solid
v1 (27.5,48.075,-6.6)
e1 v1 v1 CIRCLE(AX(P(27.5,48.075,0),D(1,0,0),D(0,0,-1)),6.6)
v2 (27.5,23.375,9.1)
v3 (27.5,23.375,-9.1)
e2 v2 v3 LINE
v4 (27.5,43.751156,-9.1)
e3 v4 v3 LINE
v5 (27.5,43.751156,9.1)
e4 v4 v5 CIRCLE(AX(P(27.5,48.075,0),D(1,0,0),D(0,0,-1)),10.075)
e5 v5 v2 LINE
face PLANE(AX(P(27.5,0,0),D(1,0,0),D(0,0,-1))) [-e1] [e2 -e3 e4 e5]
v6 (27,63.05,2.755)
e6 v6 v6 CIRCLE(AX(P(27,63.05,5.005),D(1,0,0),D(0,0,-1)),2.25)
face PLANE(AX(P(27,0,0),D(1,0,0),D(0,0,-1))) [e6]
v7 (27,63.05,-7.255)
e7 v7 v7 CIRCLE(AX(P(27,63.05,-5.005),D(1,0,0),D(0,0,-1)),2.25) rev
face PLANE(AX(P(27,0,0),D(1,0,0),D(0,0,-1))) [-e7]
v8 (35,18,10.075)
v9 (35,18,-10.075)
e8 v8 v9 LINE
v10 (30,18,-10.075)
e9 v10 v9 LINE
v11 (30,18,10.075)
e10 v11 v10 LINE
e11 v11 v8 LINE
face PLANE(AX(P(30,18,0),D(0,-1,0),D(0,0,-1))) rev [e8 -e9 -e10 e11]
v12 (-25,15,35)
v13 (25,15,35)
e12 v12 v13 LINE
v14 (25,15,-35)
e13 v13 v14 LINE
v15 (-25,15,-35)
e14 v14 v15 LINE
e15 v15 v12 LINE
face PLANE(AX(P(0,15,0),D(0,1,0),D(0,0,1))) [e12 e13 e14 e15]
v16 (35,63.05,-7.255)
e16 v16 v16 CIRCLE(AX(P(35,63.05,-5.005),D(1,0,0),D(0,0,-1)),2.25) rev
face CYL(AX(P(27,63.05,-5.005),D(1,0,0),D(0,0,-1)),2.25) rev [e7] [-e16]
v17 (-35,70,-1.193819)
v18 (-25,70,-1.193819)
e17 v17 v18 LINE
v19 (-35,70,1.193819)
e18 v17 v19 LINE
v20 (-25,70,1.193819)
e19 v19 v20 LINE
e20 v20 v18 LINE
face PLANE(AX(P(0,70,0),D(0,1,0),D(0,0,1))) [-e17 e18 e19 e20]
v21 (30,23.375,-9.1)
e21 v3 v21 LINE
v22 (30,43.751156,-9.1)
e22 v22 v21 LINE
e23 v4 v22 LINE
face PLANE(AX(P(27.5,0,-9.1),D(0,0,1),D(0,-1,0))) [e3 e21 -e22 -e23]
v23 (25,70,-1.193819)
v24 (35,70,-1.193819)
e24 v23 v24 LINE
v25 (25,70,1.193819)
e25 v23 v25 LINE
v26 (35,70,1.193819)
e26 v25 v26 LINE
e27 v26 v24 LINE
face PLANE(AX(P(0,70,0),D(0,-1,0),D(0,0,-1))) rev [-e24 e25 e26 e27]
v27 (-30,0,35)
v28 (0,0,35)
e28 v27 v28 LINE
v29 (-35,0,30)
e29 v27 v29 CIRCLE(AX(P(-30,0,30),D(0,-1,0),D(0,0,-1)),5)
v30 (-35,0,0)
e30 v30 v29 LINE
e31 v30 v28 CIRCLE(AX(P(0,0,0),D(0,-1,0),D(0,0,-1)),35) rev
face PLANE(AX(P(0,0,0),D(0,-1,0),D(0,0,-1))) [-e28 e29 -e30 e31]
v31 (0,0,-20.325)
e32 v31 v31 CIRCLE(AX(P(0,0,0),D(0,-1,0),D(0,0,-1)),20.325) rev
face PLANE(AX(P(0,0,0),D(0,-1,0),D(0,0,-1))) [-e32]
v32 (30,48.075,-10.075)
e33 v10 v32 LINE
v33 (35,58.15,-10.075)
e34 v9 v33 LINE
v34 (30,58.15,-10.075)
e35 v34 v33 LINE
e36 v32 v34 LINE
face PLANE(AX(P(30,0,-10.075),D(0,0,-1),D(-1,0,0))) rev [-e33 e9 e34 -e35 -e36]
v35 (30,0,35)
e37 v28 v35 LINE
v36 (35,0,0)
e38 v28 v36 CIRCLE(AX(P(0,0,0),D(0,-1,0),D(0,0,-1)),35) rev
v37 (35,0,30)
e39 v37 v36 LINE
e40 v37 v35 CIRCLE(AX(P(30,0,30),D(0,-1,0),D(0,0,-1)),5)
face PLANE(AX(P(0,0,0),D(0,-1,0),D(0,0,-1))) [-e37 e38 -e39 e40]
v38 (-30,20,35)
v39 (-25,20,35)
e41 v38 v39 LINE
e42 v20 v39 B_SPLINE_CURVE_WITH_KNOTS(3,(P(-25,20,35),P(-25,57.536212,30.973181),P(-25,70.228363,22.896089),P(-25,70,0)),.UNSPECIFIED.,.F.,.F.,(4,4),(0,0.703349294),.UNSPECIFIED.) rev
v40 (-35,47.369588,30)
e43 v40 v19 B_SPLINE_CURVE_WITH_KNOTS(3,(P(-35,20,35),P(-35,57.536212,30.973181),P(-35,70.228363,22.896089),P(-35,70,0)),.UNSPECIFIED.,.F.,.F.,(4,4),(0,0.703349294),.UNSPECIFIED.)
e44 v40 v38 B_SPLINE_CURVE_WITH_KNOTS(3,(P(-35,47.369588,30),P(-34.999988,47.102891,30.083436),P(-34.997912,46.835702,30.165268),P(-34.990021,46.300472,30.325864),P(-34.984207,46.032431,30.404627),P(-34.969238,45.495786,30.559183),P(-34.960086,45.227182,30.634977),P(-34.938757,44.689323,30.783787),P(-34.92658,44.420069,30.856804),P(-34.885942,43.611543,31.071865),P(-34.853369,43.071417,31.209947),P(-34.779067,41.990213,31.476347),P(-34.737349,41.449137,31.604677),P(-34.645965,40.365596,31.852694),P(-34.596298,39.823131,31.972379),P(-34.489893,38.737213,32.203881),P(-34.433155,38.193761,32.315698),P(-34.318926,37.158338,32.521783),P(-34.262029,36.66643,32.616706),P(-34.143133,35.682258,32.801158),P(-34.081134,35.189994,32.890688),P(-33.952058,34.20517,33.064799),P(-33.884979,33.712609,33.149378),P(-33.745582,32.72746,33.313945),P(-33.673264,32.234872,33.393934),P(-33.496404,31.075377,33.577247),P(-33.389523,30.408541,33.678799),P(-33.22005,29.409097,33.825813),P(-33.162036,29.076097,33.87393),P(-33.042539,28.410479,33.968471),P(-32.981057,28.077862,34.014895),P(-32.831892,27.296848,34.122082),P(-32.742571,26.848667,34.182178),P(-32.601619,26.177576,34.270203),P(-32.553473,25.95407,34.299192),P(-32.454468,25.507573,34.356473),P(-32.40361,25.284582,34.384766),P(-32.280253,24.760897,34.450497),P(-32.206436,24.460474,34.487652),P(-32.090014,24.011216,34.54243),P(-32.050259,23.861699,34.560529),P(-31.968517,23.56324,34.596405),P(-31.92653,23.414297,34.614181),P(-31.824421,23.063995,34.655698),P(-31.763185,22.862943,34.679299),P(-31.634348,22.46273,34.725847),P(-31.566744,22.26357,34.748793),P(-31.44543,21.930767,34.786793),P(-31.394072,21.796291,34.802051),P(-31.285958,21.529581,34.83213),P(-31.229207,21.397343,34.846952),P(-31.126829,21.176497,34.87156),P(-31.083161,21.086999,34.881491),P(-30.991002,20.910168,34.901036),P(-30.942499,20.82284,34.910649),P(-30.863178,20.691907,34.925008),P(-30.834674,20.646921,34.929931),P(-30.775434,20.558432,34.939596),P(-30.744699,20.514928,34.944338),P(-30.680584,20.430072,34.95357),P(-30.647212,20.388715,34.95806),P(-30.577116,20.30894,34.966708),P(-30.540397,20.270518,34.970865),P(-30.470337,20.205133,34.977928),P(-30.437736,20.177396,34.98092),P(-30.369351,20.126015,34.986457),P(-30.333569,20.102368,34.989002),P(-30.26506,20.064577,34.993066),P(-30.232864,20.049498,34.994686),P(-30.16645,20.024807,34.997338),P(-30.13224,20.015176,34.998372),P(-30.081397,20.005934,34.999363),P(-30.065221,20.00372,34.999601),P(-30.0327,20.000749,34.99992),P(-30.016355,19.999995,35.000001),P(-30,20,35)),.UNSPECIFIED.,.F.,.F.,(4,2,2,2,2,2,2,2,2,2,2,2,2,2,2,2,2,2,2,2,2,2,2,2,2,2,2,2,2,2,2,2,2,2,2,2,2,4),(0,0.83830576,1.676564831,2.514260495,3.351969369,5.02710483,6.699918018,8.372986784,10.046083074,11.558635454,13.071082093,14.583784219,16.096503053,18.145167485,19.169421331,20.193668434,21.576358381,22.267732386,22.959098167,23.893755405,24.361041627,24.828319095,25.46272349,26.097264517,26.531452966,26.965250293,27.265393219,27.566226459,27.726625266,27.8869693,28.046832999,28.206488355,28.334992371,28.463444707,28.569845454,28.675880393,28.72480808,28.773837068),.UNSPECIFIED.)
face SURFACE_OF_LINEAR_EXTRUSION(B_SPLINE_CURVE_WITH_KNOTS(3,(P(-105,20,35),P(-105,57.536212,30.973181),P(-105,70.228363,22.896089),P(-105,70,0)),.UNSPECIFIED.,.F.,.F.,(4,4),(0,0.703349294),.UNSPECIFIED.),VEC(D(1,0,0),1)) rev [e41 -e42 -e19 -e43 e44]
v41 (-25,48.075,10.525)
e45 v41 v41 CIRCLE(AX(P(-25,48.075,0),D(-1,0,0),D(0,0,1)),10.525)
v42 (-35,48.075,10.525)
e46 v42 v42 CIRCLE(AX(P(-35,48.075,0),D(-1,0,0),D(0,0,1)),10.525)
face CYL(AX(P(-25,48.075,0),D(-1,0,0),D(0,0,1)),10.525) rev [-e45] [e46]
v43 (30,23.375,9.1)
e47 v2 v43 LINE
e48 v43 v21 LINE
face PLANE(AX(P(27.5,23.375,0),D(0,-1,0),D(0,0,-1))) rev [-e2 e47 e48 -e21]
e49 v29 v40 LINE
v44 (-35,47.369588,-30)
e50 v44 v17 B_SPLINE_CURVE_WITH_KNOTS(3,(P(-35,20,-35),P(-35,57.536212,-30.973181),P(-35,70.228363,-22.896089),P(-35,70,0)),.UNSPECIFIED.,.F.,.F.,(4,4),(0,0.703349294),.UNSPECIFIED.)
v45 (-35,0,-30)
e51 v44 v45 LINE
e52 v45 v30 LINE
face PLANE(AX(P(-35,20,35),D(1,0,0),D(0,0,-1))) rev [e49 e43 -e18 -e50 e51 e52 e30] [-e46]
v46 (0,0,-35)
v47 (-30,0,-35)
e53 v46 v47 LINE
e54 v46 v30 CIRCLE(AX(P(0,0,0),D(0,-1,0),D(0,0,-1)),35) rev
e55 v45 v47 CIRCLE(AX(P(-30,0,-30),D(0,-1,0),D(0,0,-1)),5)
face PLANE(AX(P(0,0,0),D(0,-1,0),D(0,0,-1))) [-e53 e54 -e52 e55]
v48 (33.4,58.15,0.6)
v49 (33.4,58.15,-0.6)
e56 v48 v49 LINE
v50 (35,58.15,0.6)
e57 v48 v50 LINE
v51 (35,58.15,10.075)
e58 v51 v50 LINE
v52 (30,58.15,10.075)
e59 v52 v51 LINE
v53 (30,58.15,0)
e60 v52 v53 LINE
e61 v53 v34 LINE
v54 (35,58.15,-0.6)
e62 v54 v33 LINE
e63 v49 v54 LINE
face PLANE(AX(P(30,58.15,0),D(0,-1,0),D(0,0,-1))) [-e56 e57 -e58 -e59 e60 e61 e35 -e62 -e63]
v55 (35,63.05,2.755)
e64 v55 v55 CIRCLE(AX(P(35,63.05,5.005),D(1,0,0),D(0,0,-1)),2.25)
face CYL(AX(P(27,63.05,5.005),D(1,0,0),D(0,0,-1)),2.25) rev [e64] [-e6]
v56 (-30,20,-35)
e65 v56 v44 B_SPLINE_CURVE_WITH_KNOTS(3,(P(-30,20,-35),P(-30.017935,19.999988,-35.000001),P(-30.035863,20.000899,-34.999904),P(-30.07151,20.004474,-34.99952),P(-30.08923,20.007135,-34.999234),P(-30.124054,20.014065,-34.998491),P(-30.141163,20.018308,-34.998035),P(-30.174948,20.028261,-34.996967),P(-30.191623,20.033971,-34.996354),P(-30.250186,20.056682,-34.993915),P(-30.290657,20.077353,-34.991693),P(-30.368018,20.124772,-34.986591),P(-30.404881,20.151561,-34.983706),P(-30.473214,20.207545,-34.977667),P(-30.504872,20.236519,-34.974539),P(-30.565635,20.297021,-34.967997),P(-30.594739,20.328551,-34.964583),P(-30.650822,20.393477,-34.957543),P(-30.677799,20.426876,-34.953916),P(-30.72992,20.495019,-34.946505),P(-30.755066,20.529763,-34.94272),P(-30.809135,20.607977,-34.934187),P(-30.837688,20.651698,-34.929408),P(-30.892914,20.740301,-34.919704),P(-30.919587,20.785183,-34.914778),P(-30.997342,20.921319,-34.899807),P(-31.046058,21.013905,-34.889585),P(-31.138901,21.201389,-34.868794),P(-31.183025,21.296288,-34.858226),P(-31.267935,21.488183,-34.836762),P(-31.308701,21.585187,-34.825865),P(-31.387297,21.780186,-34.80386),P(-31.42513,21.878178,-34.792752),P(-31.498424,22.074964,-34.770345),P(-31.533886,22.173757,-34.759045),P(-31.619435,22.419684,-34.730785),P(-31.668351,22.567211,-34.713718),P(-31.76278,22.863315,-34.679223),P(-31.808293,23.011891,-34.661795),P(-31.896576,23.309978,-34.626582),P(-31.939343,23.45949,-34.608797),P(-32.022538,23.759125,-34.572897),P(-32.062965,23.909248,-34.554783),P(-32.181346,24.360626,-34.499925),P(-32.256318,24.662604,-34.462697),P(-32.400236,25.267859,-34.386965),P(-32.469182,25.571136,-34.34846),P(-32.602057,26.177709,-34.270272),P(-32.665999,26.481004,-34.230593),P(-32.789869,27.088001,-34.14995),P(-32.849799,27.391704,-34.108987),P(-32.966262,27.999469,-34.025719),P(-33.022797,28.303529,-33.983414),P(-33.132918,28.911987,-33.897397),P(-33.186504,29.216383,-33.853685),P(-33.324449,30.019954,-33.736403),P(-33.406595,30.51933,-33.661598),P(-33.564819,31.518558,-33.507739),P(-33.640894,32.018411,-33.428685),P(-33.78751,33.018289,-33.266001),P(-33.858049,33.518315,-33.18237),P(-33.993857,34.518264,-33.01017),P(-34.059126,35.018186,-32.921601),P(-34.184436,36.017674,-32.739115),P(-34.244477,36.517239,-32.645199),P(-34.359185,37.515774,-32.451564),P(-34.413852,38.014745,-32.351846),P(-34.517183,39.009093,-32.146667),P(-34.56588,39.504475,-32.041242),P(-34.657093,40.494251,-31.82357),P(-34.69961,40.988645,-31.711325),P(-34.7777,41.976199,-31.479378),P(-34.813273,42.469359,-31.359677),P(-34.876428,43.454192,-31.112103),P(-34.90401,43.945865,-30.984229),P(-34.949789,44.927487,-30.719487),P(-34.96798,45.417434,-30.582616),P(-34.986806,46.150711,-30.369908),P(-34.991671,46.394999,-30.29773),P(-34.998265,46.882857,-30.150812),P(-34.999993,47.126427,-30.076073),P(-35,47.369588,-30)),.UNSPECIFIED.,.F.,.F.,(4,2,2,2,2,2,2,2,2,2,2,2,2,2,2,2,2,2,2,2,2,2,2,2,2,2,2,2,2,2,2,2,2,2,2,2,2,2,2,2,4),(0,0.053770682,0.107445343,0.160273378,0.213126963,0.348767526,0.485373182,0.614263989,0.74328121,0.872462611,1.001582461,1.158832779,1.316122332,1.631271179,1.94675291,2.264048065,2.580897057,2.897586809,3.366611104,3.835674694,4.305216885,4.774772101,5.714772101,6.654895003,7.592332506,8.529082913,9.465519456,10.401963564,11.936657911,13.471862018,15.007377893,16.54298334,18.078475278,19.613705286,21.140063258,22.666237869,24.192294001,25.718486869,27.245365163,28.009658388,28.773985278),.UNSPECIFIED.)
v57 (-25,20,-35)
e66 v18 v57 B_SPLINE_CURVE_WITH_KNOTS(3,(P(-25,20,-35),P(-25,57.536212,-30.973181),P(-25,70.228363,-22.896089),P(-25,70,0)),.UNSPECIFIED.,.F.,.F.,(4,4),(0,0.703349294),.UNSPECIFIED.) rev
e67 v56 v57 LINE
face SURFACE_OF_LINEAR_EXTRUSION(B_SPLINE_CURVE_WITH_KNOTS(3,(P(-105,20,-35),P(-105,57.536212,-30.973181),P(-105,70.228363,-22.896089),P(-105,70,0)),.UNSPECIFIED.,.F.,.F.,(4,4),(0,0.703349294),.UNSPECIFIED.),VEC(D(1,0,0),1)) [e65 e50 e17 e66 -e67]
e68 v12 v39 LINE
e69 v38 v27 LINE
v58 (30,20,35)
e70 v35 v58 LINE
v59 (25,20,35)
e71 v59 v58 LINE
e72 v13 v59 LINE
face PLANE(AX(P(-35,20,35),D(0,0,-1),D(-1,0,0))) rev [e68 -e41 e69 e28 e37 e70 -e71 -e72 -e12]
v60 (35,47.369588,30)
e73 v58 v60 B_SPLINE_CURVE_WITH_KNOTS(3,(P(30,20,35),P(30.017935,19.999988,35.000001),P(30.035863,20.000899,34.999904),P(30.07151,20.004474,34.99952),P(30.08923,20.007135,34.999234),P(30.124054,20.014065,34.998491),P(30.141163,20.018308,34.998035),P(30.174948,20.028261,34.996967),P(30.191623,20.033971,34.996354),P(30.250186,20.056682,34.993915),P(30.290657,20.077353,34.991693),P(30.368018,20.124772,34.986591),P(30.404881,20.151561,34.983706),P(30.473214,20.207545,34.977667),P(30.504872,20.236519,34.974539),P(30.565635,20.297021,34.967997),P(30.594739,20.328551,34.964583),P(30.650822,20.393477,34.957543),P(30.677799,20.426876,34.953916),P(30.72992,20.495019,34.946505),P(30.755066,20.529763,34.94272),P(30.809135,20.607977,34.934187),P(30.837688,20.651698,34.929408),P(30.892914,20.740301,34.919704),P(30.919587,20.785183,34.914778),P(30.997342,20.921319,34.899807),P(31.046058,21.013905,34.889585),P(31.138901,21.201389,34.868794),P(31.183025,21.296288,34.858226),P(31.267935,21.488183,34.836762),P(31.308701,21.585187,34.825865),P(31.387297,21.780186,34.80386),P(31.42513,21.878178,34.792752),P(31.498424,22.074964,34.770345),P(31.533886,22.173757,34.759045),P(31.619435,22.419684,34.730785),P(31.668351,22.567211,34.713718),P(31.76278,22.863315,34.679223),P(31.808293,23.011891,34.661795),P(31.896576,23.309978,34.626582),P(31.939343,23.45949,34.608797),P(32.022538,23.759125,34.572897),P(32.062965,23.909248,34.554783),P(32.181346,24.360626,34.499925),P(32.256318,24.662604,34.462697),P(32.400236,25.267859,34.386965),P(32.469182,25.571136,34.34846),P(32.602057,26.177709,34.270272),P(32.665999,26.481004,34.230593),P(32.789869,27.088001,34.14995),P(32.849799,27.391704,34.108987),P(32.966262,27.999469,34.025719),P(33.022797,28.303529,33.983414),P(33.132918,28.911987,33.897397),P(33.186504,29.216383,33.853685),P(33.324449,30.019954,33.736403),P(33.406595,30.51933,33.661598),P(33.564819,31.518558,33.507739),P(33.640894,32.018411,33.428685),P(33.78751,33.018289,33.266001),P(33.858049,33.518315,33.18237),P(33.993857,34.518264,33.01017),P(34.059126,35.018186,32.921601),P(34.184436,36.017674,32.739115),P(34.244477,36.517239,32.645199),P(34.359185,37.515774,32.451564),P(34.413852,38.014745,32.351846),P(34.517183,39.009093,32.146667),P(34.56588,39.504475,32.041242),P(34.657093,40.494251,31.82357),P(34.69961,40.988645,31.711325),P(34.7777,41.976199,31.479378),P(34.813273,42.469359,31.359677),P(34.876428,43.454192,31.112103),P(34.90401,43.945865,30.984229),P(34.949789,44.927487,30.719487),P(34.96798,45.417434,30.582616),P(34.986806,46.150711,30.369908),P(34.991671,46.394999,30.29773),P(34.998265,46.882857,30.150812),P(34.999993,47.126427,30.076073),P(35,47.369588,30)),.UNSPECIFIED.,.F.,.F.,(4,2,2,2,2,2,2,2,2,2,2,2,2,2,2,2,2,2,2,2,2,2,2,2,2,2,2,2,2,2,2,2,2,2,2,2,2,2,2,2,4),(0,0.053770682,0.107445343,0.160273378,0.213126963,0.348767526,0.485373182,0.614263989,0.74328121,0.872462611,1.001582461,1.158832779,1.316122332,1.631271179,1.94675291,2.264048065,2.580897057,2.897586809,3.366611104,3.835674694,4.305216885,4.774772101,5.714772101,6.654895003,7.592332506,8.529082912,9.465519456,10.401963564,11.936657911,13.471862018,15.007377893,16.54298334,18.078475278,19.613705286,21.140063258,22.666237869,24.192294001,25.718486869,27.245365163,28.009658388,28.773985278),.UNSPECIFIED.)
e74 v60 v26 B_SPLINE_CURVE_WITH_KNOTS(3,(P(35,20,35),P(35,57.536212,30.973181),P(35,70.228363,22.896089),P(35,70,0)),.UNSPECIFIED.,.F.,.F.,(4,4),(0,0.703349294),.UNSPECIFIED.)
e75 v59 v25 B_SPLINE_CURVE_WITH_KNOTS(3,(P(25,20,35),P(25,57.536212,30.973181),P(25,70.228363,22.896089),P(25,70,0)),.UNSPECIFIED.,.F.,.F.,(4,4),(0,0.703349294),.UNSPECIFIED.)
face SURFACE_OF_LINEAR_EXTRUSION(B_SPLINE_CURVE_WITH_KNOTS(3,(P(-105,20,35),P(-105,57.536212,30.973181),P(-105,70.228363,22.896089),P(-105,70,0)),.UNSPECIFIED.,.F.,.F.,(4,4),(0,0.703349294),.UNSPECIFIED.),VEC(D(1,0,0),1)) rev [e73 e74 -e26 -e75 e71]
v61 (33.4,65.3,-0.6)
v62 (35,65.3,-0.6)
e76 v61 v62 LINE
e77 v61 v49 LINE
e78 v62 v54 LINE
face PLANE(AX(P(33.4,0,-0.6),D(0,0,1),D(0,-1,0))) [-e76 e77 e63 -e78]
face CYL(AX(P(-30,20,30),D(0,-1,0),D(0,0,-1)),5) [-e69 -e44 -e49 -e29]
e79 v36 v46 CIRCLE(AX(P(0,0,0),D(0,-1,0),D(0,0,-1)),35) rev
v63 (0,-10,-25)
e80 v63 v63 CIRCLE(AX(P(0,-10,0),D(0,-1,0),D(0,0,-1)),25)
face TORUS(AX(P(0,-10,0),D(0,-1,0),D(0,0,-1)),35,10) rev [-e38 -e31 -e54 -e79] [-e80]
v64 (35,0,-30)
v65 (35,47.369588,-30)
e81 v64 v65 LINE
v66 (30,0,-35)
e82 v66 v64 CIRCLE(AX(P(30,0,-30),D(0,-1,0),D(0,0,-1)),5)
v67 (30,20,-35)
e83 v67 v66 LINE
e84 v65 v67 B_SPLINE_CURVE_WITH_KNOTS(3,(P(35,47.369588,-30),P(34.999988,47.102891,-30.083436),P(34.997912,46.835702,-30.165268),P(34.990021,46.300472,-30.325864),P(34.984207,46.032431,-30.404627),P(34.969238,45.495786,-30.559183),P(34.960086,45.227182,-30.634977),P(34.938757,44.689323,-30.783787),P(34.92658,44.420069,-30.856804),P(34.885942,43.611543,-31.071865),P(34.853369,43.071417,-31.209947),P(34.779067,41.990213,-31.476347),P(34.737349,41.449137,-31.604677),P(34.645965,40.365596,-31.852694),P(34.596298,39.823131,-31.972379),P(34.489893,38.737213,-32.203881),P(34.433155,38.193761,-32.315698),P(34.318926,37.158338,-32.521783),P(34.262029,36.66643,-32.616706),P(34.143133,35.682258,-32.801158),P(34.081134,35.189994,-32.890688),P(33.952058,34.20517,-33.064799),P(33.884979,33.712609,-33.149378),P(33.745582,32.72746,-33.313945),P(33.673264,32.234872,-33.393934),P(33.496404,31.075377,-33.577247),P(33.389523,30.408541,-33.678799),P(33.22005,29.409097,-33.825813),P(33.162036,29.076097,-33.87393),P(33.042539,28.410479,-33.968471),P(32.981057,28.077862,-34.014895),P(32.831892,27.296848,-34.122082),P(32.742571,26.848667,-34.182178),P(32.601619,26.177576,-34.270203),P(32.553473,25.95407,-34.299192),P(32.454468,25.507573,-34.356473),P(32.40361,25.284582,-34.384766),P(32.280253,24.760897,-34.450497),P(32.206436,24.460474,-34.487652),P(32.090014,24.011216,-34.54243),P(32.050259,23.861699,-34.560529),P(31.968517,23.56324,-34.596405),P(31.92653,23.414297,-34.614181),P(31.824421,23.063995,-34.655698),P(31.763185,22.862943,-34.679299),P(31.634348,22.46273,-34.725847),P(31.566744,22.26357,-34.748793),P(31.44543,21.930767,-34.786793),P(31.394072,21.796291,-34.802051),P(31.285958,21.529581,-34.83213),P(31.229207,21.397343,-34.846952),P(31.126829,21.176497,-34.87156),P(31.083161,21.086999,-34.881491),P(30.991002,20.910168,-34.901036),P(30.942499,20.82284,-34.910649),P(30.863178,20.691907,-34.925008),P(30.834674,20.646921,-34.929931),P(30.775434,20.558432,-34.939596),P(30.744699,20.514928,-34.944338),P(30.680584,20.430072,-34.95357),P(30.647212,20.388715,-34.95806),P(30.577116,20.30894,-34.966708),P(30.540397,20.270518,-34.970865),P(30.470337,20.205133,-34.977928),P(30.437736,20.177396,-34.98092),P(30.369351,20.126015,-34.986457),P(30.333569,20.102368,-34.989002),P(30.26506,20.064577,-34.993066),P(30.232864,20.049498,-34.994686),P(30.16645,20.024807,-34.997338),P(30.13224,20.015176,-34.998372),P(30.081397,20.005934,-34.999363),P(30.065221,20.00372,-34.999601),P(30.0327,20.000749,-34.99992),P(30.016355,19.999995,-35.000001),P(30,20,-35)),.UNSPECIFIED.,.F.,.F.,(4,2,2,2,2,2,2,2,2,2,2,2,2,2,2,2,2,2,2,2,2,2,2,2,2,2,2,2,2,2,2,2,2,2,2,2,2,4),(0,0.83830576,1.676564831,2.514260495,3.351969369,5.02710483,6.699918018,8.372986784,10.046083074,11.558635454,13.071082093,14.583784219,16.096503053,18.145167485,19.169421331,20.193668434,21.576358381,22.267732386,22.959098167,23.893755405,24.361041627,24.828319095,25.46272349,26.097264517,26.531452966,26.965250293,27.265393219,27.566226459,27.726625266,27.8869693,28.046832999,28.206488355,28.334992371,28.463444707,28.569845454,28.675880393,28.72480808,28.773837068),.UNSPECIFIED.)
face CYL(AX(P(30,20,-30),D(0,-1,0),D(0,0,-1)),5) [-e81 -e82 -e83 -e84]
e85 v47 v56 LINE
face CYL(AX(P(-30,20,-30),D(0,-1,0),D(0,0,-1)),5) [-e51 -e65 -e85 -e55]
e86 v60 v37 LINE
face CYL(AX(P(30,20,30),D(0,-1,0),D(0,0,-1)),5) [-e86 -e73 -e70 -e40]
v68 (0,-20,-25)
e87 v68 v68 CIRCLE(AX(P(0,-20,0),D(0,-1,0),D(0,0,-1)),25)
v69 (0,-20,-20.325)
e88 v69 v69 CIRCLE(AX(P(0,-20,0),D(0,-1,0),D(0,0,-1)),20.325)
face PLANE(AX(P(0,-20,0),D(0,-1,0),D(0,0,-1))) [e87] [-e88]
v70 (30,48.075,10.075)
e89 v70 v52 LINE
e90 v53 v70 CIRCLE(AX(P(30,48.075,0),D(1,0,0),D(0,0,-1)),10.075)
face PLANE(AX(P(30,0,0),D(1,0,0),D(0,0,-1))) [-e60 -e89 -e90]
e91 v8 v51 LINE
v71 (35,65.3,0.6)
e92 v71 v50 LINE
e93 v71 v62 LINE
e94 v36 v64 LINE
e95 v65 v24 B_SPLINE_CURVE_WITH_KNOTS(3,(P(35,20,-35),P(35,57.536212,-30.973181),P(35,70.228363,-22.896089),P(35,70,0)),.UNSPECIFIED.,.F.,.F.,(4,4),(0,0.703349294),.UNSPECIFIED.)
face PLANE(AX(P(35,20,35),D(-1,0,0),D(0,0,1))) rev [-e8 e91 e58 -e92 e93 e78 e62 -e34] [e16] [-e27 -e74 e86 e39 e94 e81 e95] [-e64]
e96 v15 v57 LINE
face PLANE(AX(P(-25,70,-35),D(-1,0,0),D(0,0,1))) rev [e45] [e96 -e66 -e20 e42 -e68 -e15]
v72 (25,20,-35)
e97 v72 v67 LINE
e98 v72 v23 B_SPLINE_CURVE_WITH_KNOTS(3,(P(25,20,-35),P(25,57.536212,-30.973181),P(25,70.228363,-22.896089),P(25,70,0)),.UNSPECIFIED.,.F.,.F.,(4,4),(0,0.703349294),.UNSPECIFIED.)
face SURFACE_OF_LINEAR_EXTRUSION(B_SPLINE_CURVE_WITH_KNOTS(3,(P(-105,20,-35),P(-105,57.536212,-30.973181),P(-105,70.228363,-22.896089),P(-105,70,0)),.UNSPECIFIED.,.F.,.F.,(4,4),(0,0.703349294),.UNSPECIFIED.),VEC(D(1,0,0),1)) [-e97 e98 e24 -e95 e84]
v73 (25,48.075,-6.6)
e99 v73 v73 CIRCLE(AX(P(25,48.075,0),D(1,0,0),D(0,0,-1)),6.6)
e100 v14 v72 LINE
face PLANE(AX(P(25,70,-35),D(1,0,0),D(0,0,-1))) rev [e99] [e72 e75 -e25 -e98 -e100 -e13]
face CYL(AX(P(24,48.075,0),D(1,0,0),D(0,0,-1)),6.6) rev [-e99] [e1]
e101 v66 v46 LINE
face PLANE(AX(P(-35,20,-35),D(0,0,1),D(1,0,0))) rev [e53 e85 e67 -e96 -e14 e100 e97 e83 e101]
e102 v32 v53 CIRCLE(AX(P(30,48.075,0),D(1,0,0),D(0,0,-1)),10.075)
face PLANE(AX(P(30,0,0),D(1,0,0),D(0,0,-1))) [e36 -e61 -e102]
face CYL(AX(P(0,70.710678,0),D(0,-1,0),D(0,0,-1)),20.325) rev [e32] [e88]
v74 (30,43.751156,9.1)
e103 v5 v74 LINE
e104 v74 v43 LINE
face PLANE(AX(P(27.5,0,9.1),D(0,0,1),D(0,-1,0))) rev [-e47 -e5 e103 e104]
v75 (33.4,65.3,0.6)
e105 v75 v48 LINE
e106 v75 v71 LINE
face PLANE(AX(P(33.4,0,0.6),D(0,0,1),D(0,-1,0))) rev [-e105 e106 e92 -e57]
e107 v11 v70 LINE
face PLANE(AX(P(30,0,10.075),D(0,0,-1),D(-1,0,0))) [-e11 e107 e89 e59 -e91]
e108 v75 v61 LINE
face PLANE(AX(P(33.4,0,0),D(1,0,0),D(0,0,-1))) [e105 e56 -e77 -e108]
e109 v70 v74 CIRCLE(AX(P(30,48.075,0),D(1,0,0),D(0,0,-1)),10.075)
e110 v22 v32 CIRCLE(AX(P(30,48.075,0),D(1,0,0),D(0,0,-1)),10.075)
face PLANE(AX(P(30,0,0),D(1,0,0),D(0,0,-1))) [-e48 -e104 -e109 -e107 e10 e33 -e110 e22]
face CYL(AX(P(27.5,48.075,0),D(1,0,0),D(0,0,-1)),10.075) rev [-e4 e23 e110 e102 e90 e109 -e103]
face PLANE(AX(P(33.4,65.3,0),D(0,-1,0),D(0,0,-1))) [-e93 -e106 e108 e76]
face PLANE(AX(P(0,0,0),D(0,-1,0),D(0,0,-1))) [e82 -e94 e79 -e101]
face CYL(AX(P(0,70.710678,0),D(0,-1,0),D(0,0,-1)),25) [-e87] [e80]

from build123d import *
from build123d.topology import SkipClean

# Parameters (mm, degrees)
SKETCH1_W           = 70
SKETCH1_H           = 70
BOSS_EXTRUDE1_DEPTH = 20
SKETCH3_W           = 10
SKETCH3_H           = 70
BOSS_EXTRUDE2_DEPTH = 50
SKETCH4_R           = 25
SKETCH4_R_2         = 20.325
BOSS_EXTRUDE3_DEPTH = 20
FILLET1_R           = 10
SKETCH5_W           = 20.15
SKETCH5_H           = 40.15
CUT_EXTRUDE1_DEPTH  = 5
CUT_EXTRUDE3_DEPTH  = 140
CUT_EXTRUDE4_DEPTH  = 2.5
SKETCH9_W           = 50
SKETCH9_H           = 70
CUT_EXTRUDE5_DEPTH  = 5
SKETCH8_4_R         = 6.6
SKETCH8_4_R_2       = 3.1
CUT_EXTRUDE8_DEPTH  = 6
SKETCH12_R          = 2.25
CUT_EXTRUDE9_DEPTH  = 8
SKETCH12_3_W        = 1.2
SKETCH12_3_H        = 7.15
CUT_EXTRUDE10_DEPTH = 1.6
SKETCH8_5_R         = 3.1
CUT_EXTRUDE11_DEPTH = 10
SKETCH13_R          = 10.525
CUT_EXTRUDE12_DEPTH = 10
FILLET2_R           = 5


with BuildPart() as part:
    # Sketch1 → Boss-Extrude1 (new body)
    with BuildSketch(Plane(origin=(0, 0, 0), x_dir=(1, 0, 0), z_dir=(0, 1, 0))):
        Rectangle(SKETCH1_W, SKETCH1_H)
    extrude(amount=BOSS_EXTRUDE1_DEPTH)

    # Sketch3 → Boss-Extrude2 (add)
    with BuildSketch(Plane(origin=(0, 20, 0), x_dir=(1, 0, 0), z_dir=(0, 1, 0))):
        with Locations((-30, 0)):
            Rectangle(SKETCH3_W, SKETCH3_H)
        with Locations((30, 0)):
            Rectangle(SKETCH3_W, SKETCH3_H)
    extrude(amount=BOSS_EXTRUDE2_DEPTH)

    # Sketch4 → Boss-Extrude3 (add)
    with BuildSketch(Plane(origin=(0, -20, 0), x_dir=(-1, 0, 0), z_dir=(0, -1, 0))):
        with Locations(Location((0, 0, 0), (0, 0, 90))):
            Circle(SKETCH4_R)
        with Locations(Location((0, 0, 0), (0, 0, 90))):
            Circle(SKETCH4_R_2, mode=Mode.SUBTRACT)
    extrude(amount=-BOSS_EXTRUDE3_DEPTH)

    # Fillet1
    fillet1_edges = [part.edges().sort_by_distance(p)[0] for p in [
        (0, 0, 25),
    ]]
    fillet(fillet1_edges, radius=FILLET1_R - 0.0001)  # a hair under: the kernel refuses the full size

    # Sketch5 → Cut-Extrude1 (cut)
    with BuildSketch(Plane(origin=(35, 0, 0), x_dir=(0, 0, -1), z_dir=(1, 0, 0))):
        with Locations((0, 38.075)):
            Rectangle(SKETCH5_W, SKETCH5_H)
    extrude(amount=-CUT_EXTRUDE1_DEPTH, mode=Mode.SUBTRACT)

    # Sketch6 → Cut-Extrude3 (cut)
    with BuildSketch(Plane(origin=(35, 0, 0), x_dir=(0, 0, -1), z_dir=(1, 0, 0))):
        with BuildLine():
            Line((-35, 70), (-35, 20))
            add(Edge.make_bspline(
                [(-35, 20), (-31.043970013, 56.876347524), (-23.178818695, 69.774444442), (-1.193819381, 70)],
                knots=[0, 0, 0, 0, 0.690984823, 0.690984823, 0.690984823, 0.690984823], degree=3))
            Line((-1.193819381, 70), (-35, 70))
        make_face()
        with BuildLine():
            add(Edge.make_bspline(
                [(35, 20), (31.043970013, 56.876347524), (23.178818695, 69.774444442), (1.193819381, 70)],
                knots=[0, 0, 0, 0, 0.690984823, 0.690984823, 0.690984823, 0.690984823], degree=3))
            Line((35, 20), (35, 70))
            Line((35, 70), (1.193819381, 70))
        make_face()
    extrude(amount=-CUT_EXTRUDE3_DEPTH, mode=Mode.SUBTRACT)

    # Sketch8 → Cut-Extrude4 (cut)
    with BuildSketch(Plane(origin=(30, 0, 0), x_dir=(0, 0, -1), z_dir=(1, 0, 0))):
        with BuildLine():
            ThreePointArc((10.075, 48.075), (7.124100826, 55.199100815), (1.7e-08, 58.15))
            ThreePointArc((1.7e-08, 58.15), (-7.124100815, 55.199100826), (-10.075, 48.075))
            ThreePointArc((-10.075, 48.075), (-9.828227841, 45.858795474), (-9.1, 43.751156224))
            Line((-9.1, 43.751156224), (-9.1, 48.075))
            Line((-9.1, 48.075), (-6.6, 48.075))
            ThreePointArc((-6.6, 48.075), (0, 54.675), (6.6, 48.075))
            Line((6.6, 48.075), (9.1, 48.075))
            Line((9.1, 48.075), (9.1, 43.751156224))
            ThreePointArc((9.1, 43.751156224), (9.828227841, 45.858795474), (10.075, 48.075))
        make_face()
        with BuildLine():
            Line((-9.1, 48.075), (-9.1, 43.751156224))
            ThreePointArc((-9.1, 43.751156224), (0, 38), (9.1, 43.751156224))
            Line((9.1, 43.751156224), (9.1, 48.075))
            Line((9.1, 48.075), (6.6, 48.075))
            ThreePointArc((6.6, 48.075), (0, 41.475), (-6.6, 48.075))
            Line((-6.6, 48.075), (-9.1, 48.075))
        make_face()
        with BuildLine():
            ThreePointArc((9.1, 43.751156224), (0, 38), (-9.1, 43.751156224))
            Line((-9.1, 43.751156224), (-9.1, 23.375))
            Line((-9.1, 23.375), (9.1, 23.375))
            Line((9.1, 23.375), (9.1, 43.751156224))
        make_face()
        with BuildLine():
            ThreePointArc((6.6, 48.075), (0, 54.675), (-6.6, 48.075))
            Line((-6.6, 48.075), (-3.1, 48.075))
            ThreePointArc((-3.1, 48.075), (0, 51.175), (3.1, 48.075))
            Line((3.1, 48.075), (6.6, 48.075))
        make_face()
        with BuildLine():
            Line((-3.1, 48.075), (-6.6, 48.075))
            ThreePointArc((-6.6, 48.075), (0, 41.475), (6.6, 48.075))
            Line((6.6, 48.075), (3.1, 48.075))
            ThreePointArc((3.1, 48.075), (0, 44.975), (-3.1, 48.075))
        make_face()
    extrude(amount=-CUT_EXTRUDE4_DEPTH, mode=Mode.SUBTRACT)

    # Sketch9 → Cut-Extrude5 (cut)
    with BuildSketch(Plane(origin=(0, 20, 0), x_dir=(1, 0, 0), z_dir=(0, 1, 0))):
        Rectangle(SKETCH9_W, SKETCH9_H)
    extrude(amount=-CUT_EXTRUDE5_DEPTH, mode=Mode.SUBTRACT)

    # Sketch8<4> → Cut-Extrude8 (cut)
    with SkipClean():  # the faces are left unmerged after this step: merging them gives an invalid solid
        with BuildSketch(Plane(origin=(30, 0, 0), x_dir=(0, 0, -1), z_dir=(1, 0, 0))):
            with Locations((0, 48.075)):
                Circle(SKETCH8_4_R)
            with Locations((0, 48.075)):
                Circle(SKETCH8_4_R_2, mode=Mode.SUBTRACT)
        extrude(amount=-CUT_EXTRUDE8_DEPTH, mode=Mode.SUBTRACT)


with BuildPart() as cut_extrude8_piece_1:
    # of the separate pieces the step leaves, piece 1, a body of its own (cut_extrude8_pieces)
    add(part.part.solids().sort_by_distance((0, 0, -34.9999))[0])

    # Sketch12 → Cut-Extrude9 (cut)
    with BuildSketch(Plane(origin=(35, 0, 0), x_dir=(0, 0, -1), z_dir=(1, 0, 0))):
        with Locations((-5.005, 63.05)):
            Circle(SKETCH12_R)
        with Locations((5.005, 63.05)):
            Circle(SKETCH12_R)
    extrude(amount=-CUT_EXTRUDE9_DEPTH, mode=Mode.SUBTRACT)

    # Sketch12<3> → Cut-Extrude10 (cut)
    with BuildSketch(Plane(origin=(35, 0, 0), x_dir=(0, 0, -1), z_dir=(1, 0, 0))):
        with Locations((0, 61.725)):
            Rectangle(SKETCH12_3_W, SKETCH12_3_H)
    extrude(amount=-CUT_EXTRUDE10_DEPTH, mode=Mode.SUBTRACT)

    # Sketch13 → Cut-Extrude12 (cut)
    with BuildSketch(Plane.ZY.offset(35)):
        with Locations((0, 48.075)):
            Circle(SKETCH13_R)
    extrude(amount=-CUT_EXTRUDE12_DEPTH, mode=Mode.SUBTRACT)

    # Fillet2
    fillet2_edges = [cut_extrude8_piece_1.edges().sort_by_distance(p)[0] for p in [
        (-35, 10, 35),
        (35, 10, 35),
        (35, 10, -35),
        (-35, 10, -35),
    ]]
    fillet(fillet2_edges, radius=FILLET2_R)


with BuildPart() as cut_extrude8_piece_2:
    # of the separate pieces the step leaves, piece 2, a body of its own (cut_extrude8_pieces)
    add(part.part.solids().sort_by_distance((25, 48.075, -3.1))[0])

    # Sketch8<5> → Cut-Extrude11 (cut)
    with BuildSketch(Plane(origin=(30, 0, 0), x_dir=(0, 0, -1), z_dir=(1, 0, 0))):
        with Locations((0, 48.075)):
            Circle(SKETCH8_5_R)
    extrude(amount=-CUT_EXTRUDE11_DEPTH, mode=Mode.SUBTRACT)


solid = cut_extrude8_piece_1.part
